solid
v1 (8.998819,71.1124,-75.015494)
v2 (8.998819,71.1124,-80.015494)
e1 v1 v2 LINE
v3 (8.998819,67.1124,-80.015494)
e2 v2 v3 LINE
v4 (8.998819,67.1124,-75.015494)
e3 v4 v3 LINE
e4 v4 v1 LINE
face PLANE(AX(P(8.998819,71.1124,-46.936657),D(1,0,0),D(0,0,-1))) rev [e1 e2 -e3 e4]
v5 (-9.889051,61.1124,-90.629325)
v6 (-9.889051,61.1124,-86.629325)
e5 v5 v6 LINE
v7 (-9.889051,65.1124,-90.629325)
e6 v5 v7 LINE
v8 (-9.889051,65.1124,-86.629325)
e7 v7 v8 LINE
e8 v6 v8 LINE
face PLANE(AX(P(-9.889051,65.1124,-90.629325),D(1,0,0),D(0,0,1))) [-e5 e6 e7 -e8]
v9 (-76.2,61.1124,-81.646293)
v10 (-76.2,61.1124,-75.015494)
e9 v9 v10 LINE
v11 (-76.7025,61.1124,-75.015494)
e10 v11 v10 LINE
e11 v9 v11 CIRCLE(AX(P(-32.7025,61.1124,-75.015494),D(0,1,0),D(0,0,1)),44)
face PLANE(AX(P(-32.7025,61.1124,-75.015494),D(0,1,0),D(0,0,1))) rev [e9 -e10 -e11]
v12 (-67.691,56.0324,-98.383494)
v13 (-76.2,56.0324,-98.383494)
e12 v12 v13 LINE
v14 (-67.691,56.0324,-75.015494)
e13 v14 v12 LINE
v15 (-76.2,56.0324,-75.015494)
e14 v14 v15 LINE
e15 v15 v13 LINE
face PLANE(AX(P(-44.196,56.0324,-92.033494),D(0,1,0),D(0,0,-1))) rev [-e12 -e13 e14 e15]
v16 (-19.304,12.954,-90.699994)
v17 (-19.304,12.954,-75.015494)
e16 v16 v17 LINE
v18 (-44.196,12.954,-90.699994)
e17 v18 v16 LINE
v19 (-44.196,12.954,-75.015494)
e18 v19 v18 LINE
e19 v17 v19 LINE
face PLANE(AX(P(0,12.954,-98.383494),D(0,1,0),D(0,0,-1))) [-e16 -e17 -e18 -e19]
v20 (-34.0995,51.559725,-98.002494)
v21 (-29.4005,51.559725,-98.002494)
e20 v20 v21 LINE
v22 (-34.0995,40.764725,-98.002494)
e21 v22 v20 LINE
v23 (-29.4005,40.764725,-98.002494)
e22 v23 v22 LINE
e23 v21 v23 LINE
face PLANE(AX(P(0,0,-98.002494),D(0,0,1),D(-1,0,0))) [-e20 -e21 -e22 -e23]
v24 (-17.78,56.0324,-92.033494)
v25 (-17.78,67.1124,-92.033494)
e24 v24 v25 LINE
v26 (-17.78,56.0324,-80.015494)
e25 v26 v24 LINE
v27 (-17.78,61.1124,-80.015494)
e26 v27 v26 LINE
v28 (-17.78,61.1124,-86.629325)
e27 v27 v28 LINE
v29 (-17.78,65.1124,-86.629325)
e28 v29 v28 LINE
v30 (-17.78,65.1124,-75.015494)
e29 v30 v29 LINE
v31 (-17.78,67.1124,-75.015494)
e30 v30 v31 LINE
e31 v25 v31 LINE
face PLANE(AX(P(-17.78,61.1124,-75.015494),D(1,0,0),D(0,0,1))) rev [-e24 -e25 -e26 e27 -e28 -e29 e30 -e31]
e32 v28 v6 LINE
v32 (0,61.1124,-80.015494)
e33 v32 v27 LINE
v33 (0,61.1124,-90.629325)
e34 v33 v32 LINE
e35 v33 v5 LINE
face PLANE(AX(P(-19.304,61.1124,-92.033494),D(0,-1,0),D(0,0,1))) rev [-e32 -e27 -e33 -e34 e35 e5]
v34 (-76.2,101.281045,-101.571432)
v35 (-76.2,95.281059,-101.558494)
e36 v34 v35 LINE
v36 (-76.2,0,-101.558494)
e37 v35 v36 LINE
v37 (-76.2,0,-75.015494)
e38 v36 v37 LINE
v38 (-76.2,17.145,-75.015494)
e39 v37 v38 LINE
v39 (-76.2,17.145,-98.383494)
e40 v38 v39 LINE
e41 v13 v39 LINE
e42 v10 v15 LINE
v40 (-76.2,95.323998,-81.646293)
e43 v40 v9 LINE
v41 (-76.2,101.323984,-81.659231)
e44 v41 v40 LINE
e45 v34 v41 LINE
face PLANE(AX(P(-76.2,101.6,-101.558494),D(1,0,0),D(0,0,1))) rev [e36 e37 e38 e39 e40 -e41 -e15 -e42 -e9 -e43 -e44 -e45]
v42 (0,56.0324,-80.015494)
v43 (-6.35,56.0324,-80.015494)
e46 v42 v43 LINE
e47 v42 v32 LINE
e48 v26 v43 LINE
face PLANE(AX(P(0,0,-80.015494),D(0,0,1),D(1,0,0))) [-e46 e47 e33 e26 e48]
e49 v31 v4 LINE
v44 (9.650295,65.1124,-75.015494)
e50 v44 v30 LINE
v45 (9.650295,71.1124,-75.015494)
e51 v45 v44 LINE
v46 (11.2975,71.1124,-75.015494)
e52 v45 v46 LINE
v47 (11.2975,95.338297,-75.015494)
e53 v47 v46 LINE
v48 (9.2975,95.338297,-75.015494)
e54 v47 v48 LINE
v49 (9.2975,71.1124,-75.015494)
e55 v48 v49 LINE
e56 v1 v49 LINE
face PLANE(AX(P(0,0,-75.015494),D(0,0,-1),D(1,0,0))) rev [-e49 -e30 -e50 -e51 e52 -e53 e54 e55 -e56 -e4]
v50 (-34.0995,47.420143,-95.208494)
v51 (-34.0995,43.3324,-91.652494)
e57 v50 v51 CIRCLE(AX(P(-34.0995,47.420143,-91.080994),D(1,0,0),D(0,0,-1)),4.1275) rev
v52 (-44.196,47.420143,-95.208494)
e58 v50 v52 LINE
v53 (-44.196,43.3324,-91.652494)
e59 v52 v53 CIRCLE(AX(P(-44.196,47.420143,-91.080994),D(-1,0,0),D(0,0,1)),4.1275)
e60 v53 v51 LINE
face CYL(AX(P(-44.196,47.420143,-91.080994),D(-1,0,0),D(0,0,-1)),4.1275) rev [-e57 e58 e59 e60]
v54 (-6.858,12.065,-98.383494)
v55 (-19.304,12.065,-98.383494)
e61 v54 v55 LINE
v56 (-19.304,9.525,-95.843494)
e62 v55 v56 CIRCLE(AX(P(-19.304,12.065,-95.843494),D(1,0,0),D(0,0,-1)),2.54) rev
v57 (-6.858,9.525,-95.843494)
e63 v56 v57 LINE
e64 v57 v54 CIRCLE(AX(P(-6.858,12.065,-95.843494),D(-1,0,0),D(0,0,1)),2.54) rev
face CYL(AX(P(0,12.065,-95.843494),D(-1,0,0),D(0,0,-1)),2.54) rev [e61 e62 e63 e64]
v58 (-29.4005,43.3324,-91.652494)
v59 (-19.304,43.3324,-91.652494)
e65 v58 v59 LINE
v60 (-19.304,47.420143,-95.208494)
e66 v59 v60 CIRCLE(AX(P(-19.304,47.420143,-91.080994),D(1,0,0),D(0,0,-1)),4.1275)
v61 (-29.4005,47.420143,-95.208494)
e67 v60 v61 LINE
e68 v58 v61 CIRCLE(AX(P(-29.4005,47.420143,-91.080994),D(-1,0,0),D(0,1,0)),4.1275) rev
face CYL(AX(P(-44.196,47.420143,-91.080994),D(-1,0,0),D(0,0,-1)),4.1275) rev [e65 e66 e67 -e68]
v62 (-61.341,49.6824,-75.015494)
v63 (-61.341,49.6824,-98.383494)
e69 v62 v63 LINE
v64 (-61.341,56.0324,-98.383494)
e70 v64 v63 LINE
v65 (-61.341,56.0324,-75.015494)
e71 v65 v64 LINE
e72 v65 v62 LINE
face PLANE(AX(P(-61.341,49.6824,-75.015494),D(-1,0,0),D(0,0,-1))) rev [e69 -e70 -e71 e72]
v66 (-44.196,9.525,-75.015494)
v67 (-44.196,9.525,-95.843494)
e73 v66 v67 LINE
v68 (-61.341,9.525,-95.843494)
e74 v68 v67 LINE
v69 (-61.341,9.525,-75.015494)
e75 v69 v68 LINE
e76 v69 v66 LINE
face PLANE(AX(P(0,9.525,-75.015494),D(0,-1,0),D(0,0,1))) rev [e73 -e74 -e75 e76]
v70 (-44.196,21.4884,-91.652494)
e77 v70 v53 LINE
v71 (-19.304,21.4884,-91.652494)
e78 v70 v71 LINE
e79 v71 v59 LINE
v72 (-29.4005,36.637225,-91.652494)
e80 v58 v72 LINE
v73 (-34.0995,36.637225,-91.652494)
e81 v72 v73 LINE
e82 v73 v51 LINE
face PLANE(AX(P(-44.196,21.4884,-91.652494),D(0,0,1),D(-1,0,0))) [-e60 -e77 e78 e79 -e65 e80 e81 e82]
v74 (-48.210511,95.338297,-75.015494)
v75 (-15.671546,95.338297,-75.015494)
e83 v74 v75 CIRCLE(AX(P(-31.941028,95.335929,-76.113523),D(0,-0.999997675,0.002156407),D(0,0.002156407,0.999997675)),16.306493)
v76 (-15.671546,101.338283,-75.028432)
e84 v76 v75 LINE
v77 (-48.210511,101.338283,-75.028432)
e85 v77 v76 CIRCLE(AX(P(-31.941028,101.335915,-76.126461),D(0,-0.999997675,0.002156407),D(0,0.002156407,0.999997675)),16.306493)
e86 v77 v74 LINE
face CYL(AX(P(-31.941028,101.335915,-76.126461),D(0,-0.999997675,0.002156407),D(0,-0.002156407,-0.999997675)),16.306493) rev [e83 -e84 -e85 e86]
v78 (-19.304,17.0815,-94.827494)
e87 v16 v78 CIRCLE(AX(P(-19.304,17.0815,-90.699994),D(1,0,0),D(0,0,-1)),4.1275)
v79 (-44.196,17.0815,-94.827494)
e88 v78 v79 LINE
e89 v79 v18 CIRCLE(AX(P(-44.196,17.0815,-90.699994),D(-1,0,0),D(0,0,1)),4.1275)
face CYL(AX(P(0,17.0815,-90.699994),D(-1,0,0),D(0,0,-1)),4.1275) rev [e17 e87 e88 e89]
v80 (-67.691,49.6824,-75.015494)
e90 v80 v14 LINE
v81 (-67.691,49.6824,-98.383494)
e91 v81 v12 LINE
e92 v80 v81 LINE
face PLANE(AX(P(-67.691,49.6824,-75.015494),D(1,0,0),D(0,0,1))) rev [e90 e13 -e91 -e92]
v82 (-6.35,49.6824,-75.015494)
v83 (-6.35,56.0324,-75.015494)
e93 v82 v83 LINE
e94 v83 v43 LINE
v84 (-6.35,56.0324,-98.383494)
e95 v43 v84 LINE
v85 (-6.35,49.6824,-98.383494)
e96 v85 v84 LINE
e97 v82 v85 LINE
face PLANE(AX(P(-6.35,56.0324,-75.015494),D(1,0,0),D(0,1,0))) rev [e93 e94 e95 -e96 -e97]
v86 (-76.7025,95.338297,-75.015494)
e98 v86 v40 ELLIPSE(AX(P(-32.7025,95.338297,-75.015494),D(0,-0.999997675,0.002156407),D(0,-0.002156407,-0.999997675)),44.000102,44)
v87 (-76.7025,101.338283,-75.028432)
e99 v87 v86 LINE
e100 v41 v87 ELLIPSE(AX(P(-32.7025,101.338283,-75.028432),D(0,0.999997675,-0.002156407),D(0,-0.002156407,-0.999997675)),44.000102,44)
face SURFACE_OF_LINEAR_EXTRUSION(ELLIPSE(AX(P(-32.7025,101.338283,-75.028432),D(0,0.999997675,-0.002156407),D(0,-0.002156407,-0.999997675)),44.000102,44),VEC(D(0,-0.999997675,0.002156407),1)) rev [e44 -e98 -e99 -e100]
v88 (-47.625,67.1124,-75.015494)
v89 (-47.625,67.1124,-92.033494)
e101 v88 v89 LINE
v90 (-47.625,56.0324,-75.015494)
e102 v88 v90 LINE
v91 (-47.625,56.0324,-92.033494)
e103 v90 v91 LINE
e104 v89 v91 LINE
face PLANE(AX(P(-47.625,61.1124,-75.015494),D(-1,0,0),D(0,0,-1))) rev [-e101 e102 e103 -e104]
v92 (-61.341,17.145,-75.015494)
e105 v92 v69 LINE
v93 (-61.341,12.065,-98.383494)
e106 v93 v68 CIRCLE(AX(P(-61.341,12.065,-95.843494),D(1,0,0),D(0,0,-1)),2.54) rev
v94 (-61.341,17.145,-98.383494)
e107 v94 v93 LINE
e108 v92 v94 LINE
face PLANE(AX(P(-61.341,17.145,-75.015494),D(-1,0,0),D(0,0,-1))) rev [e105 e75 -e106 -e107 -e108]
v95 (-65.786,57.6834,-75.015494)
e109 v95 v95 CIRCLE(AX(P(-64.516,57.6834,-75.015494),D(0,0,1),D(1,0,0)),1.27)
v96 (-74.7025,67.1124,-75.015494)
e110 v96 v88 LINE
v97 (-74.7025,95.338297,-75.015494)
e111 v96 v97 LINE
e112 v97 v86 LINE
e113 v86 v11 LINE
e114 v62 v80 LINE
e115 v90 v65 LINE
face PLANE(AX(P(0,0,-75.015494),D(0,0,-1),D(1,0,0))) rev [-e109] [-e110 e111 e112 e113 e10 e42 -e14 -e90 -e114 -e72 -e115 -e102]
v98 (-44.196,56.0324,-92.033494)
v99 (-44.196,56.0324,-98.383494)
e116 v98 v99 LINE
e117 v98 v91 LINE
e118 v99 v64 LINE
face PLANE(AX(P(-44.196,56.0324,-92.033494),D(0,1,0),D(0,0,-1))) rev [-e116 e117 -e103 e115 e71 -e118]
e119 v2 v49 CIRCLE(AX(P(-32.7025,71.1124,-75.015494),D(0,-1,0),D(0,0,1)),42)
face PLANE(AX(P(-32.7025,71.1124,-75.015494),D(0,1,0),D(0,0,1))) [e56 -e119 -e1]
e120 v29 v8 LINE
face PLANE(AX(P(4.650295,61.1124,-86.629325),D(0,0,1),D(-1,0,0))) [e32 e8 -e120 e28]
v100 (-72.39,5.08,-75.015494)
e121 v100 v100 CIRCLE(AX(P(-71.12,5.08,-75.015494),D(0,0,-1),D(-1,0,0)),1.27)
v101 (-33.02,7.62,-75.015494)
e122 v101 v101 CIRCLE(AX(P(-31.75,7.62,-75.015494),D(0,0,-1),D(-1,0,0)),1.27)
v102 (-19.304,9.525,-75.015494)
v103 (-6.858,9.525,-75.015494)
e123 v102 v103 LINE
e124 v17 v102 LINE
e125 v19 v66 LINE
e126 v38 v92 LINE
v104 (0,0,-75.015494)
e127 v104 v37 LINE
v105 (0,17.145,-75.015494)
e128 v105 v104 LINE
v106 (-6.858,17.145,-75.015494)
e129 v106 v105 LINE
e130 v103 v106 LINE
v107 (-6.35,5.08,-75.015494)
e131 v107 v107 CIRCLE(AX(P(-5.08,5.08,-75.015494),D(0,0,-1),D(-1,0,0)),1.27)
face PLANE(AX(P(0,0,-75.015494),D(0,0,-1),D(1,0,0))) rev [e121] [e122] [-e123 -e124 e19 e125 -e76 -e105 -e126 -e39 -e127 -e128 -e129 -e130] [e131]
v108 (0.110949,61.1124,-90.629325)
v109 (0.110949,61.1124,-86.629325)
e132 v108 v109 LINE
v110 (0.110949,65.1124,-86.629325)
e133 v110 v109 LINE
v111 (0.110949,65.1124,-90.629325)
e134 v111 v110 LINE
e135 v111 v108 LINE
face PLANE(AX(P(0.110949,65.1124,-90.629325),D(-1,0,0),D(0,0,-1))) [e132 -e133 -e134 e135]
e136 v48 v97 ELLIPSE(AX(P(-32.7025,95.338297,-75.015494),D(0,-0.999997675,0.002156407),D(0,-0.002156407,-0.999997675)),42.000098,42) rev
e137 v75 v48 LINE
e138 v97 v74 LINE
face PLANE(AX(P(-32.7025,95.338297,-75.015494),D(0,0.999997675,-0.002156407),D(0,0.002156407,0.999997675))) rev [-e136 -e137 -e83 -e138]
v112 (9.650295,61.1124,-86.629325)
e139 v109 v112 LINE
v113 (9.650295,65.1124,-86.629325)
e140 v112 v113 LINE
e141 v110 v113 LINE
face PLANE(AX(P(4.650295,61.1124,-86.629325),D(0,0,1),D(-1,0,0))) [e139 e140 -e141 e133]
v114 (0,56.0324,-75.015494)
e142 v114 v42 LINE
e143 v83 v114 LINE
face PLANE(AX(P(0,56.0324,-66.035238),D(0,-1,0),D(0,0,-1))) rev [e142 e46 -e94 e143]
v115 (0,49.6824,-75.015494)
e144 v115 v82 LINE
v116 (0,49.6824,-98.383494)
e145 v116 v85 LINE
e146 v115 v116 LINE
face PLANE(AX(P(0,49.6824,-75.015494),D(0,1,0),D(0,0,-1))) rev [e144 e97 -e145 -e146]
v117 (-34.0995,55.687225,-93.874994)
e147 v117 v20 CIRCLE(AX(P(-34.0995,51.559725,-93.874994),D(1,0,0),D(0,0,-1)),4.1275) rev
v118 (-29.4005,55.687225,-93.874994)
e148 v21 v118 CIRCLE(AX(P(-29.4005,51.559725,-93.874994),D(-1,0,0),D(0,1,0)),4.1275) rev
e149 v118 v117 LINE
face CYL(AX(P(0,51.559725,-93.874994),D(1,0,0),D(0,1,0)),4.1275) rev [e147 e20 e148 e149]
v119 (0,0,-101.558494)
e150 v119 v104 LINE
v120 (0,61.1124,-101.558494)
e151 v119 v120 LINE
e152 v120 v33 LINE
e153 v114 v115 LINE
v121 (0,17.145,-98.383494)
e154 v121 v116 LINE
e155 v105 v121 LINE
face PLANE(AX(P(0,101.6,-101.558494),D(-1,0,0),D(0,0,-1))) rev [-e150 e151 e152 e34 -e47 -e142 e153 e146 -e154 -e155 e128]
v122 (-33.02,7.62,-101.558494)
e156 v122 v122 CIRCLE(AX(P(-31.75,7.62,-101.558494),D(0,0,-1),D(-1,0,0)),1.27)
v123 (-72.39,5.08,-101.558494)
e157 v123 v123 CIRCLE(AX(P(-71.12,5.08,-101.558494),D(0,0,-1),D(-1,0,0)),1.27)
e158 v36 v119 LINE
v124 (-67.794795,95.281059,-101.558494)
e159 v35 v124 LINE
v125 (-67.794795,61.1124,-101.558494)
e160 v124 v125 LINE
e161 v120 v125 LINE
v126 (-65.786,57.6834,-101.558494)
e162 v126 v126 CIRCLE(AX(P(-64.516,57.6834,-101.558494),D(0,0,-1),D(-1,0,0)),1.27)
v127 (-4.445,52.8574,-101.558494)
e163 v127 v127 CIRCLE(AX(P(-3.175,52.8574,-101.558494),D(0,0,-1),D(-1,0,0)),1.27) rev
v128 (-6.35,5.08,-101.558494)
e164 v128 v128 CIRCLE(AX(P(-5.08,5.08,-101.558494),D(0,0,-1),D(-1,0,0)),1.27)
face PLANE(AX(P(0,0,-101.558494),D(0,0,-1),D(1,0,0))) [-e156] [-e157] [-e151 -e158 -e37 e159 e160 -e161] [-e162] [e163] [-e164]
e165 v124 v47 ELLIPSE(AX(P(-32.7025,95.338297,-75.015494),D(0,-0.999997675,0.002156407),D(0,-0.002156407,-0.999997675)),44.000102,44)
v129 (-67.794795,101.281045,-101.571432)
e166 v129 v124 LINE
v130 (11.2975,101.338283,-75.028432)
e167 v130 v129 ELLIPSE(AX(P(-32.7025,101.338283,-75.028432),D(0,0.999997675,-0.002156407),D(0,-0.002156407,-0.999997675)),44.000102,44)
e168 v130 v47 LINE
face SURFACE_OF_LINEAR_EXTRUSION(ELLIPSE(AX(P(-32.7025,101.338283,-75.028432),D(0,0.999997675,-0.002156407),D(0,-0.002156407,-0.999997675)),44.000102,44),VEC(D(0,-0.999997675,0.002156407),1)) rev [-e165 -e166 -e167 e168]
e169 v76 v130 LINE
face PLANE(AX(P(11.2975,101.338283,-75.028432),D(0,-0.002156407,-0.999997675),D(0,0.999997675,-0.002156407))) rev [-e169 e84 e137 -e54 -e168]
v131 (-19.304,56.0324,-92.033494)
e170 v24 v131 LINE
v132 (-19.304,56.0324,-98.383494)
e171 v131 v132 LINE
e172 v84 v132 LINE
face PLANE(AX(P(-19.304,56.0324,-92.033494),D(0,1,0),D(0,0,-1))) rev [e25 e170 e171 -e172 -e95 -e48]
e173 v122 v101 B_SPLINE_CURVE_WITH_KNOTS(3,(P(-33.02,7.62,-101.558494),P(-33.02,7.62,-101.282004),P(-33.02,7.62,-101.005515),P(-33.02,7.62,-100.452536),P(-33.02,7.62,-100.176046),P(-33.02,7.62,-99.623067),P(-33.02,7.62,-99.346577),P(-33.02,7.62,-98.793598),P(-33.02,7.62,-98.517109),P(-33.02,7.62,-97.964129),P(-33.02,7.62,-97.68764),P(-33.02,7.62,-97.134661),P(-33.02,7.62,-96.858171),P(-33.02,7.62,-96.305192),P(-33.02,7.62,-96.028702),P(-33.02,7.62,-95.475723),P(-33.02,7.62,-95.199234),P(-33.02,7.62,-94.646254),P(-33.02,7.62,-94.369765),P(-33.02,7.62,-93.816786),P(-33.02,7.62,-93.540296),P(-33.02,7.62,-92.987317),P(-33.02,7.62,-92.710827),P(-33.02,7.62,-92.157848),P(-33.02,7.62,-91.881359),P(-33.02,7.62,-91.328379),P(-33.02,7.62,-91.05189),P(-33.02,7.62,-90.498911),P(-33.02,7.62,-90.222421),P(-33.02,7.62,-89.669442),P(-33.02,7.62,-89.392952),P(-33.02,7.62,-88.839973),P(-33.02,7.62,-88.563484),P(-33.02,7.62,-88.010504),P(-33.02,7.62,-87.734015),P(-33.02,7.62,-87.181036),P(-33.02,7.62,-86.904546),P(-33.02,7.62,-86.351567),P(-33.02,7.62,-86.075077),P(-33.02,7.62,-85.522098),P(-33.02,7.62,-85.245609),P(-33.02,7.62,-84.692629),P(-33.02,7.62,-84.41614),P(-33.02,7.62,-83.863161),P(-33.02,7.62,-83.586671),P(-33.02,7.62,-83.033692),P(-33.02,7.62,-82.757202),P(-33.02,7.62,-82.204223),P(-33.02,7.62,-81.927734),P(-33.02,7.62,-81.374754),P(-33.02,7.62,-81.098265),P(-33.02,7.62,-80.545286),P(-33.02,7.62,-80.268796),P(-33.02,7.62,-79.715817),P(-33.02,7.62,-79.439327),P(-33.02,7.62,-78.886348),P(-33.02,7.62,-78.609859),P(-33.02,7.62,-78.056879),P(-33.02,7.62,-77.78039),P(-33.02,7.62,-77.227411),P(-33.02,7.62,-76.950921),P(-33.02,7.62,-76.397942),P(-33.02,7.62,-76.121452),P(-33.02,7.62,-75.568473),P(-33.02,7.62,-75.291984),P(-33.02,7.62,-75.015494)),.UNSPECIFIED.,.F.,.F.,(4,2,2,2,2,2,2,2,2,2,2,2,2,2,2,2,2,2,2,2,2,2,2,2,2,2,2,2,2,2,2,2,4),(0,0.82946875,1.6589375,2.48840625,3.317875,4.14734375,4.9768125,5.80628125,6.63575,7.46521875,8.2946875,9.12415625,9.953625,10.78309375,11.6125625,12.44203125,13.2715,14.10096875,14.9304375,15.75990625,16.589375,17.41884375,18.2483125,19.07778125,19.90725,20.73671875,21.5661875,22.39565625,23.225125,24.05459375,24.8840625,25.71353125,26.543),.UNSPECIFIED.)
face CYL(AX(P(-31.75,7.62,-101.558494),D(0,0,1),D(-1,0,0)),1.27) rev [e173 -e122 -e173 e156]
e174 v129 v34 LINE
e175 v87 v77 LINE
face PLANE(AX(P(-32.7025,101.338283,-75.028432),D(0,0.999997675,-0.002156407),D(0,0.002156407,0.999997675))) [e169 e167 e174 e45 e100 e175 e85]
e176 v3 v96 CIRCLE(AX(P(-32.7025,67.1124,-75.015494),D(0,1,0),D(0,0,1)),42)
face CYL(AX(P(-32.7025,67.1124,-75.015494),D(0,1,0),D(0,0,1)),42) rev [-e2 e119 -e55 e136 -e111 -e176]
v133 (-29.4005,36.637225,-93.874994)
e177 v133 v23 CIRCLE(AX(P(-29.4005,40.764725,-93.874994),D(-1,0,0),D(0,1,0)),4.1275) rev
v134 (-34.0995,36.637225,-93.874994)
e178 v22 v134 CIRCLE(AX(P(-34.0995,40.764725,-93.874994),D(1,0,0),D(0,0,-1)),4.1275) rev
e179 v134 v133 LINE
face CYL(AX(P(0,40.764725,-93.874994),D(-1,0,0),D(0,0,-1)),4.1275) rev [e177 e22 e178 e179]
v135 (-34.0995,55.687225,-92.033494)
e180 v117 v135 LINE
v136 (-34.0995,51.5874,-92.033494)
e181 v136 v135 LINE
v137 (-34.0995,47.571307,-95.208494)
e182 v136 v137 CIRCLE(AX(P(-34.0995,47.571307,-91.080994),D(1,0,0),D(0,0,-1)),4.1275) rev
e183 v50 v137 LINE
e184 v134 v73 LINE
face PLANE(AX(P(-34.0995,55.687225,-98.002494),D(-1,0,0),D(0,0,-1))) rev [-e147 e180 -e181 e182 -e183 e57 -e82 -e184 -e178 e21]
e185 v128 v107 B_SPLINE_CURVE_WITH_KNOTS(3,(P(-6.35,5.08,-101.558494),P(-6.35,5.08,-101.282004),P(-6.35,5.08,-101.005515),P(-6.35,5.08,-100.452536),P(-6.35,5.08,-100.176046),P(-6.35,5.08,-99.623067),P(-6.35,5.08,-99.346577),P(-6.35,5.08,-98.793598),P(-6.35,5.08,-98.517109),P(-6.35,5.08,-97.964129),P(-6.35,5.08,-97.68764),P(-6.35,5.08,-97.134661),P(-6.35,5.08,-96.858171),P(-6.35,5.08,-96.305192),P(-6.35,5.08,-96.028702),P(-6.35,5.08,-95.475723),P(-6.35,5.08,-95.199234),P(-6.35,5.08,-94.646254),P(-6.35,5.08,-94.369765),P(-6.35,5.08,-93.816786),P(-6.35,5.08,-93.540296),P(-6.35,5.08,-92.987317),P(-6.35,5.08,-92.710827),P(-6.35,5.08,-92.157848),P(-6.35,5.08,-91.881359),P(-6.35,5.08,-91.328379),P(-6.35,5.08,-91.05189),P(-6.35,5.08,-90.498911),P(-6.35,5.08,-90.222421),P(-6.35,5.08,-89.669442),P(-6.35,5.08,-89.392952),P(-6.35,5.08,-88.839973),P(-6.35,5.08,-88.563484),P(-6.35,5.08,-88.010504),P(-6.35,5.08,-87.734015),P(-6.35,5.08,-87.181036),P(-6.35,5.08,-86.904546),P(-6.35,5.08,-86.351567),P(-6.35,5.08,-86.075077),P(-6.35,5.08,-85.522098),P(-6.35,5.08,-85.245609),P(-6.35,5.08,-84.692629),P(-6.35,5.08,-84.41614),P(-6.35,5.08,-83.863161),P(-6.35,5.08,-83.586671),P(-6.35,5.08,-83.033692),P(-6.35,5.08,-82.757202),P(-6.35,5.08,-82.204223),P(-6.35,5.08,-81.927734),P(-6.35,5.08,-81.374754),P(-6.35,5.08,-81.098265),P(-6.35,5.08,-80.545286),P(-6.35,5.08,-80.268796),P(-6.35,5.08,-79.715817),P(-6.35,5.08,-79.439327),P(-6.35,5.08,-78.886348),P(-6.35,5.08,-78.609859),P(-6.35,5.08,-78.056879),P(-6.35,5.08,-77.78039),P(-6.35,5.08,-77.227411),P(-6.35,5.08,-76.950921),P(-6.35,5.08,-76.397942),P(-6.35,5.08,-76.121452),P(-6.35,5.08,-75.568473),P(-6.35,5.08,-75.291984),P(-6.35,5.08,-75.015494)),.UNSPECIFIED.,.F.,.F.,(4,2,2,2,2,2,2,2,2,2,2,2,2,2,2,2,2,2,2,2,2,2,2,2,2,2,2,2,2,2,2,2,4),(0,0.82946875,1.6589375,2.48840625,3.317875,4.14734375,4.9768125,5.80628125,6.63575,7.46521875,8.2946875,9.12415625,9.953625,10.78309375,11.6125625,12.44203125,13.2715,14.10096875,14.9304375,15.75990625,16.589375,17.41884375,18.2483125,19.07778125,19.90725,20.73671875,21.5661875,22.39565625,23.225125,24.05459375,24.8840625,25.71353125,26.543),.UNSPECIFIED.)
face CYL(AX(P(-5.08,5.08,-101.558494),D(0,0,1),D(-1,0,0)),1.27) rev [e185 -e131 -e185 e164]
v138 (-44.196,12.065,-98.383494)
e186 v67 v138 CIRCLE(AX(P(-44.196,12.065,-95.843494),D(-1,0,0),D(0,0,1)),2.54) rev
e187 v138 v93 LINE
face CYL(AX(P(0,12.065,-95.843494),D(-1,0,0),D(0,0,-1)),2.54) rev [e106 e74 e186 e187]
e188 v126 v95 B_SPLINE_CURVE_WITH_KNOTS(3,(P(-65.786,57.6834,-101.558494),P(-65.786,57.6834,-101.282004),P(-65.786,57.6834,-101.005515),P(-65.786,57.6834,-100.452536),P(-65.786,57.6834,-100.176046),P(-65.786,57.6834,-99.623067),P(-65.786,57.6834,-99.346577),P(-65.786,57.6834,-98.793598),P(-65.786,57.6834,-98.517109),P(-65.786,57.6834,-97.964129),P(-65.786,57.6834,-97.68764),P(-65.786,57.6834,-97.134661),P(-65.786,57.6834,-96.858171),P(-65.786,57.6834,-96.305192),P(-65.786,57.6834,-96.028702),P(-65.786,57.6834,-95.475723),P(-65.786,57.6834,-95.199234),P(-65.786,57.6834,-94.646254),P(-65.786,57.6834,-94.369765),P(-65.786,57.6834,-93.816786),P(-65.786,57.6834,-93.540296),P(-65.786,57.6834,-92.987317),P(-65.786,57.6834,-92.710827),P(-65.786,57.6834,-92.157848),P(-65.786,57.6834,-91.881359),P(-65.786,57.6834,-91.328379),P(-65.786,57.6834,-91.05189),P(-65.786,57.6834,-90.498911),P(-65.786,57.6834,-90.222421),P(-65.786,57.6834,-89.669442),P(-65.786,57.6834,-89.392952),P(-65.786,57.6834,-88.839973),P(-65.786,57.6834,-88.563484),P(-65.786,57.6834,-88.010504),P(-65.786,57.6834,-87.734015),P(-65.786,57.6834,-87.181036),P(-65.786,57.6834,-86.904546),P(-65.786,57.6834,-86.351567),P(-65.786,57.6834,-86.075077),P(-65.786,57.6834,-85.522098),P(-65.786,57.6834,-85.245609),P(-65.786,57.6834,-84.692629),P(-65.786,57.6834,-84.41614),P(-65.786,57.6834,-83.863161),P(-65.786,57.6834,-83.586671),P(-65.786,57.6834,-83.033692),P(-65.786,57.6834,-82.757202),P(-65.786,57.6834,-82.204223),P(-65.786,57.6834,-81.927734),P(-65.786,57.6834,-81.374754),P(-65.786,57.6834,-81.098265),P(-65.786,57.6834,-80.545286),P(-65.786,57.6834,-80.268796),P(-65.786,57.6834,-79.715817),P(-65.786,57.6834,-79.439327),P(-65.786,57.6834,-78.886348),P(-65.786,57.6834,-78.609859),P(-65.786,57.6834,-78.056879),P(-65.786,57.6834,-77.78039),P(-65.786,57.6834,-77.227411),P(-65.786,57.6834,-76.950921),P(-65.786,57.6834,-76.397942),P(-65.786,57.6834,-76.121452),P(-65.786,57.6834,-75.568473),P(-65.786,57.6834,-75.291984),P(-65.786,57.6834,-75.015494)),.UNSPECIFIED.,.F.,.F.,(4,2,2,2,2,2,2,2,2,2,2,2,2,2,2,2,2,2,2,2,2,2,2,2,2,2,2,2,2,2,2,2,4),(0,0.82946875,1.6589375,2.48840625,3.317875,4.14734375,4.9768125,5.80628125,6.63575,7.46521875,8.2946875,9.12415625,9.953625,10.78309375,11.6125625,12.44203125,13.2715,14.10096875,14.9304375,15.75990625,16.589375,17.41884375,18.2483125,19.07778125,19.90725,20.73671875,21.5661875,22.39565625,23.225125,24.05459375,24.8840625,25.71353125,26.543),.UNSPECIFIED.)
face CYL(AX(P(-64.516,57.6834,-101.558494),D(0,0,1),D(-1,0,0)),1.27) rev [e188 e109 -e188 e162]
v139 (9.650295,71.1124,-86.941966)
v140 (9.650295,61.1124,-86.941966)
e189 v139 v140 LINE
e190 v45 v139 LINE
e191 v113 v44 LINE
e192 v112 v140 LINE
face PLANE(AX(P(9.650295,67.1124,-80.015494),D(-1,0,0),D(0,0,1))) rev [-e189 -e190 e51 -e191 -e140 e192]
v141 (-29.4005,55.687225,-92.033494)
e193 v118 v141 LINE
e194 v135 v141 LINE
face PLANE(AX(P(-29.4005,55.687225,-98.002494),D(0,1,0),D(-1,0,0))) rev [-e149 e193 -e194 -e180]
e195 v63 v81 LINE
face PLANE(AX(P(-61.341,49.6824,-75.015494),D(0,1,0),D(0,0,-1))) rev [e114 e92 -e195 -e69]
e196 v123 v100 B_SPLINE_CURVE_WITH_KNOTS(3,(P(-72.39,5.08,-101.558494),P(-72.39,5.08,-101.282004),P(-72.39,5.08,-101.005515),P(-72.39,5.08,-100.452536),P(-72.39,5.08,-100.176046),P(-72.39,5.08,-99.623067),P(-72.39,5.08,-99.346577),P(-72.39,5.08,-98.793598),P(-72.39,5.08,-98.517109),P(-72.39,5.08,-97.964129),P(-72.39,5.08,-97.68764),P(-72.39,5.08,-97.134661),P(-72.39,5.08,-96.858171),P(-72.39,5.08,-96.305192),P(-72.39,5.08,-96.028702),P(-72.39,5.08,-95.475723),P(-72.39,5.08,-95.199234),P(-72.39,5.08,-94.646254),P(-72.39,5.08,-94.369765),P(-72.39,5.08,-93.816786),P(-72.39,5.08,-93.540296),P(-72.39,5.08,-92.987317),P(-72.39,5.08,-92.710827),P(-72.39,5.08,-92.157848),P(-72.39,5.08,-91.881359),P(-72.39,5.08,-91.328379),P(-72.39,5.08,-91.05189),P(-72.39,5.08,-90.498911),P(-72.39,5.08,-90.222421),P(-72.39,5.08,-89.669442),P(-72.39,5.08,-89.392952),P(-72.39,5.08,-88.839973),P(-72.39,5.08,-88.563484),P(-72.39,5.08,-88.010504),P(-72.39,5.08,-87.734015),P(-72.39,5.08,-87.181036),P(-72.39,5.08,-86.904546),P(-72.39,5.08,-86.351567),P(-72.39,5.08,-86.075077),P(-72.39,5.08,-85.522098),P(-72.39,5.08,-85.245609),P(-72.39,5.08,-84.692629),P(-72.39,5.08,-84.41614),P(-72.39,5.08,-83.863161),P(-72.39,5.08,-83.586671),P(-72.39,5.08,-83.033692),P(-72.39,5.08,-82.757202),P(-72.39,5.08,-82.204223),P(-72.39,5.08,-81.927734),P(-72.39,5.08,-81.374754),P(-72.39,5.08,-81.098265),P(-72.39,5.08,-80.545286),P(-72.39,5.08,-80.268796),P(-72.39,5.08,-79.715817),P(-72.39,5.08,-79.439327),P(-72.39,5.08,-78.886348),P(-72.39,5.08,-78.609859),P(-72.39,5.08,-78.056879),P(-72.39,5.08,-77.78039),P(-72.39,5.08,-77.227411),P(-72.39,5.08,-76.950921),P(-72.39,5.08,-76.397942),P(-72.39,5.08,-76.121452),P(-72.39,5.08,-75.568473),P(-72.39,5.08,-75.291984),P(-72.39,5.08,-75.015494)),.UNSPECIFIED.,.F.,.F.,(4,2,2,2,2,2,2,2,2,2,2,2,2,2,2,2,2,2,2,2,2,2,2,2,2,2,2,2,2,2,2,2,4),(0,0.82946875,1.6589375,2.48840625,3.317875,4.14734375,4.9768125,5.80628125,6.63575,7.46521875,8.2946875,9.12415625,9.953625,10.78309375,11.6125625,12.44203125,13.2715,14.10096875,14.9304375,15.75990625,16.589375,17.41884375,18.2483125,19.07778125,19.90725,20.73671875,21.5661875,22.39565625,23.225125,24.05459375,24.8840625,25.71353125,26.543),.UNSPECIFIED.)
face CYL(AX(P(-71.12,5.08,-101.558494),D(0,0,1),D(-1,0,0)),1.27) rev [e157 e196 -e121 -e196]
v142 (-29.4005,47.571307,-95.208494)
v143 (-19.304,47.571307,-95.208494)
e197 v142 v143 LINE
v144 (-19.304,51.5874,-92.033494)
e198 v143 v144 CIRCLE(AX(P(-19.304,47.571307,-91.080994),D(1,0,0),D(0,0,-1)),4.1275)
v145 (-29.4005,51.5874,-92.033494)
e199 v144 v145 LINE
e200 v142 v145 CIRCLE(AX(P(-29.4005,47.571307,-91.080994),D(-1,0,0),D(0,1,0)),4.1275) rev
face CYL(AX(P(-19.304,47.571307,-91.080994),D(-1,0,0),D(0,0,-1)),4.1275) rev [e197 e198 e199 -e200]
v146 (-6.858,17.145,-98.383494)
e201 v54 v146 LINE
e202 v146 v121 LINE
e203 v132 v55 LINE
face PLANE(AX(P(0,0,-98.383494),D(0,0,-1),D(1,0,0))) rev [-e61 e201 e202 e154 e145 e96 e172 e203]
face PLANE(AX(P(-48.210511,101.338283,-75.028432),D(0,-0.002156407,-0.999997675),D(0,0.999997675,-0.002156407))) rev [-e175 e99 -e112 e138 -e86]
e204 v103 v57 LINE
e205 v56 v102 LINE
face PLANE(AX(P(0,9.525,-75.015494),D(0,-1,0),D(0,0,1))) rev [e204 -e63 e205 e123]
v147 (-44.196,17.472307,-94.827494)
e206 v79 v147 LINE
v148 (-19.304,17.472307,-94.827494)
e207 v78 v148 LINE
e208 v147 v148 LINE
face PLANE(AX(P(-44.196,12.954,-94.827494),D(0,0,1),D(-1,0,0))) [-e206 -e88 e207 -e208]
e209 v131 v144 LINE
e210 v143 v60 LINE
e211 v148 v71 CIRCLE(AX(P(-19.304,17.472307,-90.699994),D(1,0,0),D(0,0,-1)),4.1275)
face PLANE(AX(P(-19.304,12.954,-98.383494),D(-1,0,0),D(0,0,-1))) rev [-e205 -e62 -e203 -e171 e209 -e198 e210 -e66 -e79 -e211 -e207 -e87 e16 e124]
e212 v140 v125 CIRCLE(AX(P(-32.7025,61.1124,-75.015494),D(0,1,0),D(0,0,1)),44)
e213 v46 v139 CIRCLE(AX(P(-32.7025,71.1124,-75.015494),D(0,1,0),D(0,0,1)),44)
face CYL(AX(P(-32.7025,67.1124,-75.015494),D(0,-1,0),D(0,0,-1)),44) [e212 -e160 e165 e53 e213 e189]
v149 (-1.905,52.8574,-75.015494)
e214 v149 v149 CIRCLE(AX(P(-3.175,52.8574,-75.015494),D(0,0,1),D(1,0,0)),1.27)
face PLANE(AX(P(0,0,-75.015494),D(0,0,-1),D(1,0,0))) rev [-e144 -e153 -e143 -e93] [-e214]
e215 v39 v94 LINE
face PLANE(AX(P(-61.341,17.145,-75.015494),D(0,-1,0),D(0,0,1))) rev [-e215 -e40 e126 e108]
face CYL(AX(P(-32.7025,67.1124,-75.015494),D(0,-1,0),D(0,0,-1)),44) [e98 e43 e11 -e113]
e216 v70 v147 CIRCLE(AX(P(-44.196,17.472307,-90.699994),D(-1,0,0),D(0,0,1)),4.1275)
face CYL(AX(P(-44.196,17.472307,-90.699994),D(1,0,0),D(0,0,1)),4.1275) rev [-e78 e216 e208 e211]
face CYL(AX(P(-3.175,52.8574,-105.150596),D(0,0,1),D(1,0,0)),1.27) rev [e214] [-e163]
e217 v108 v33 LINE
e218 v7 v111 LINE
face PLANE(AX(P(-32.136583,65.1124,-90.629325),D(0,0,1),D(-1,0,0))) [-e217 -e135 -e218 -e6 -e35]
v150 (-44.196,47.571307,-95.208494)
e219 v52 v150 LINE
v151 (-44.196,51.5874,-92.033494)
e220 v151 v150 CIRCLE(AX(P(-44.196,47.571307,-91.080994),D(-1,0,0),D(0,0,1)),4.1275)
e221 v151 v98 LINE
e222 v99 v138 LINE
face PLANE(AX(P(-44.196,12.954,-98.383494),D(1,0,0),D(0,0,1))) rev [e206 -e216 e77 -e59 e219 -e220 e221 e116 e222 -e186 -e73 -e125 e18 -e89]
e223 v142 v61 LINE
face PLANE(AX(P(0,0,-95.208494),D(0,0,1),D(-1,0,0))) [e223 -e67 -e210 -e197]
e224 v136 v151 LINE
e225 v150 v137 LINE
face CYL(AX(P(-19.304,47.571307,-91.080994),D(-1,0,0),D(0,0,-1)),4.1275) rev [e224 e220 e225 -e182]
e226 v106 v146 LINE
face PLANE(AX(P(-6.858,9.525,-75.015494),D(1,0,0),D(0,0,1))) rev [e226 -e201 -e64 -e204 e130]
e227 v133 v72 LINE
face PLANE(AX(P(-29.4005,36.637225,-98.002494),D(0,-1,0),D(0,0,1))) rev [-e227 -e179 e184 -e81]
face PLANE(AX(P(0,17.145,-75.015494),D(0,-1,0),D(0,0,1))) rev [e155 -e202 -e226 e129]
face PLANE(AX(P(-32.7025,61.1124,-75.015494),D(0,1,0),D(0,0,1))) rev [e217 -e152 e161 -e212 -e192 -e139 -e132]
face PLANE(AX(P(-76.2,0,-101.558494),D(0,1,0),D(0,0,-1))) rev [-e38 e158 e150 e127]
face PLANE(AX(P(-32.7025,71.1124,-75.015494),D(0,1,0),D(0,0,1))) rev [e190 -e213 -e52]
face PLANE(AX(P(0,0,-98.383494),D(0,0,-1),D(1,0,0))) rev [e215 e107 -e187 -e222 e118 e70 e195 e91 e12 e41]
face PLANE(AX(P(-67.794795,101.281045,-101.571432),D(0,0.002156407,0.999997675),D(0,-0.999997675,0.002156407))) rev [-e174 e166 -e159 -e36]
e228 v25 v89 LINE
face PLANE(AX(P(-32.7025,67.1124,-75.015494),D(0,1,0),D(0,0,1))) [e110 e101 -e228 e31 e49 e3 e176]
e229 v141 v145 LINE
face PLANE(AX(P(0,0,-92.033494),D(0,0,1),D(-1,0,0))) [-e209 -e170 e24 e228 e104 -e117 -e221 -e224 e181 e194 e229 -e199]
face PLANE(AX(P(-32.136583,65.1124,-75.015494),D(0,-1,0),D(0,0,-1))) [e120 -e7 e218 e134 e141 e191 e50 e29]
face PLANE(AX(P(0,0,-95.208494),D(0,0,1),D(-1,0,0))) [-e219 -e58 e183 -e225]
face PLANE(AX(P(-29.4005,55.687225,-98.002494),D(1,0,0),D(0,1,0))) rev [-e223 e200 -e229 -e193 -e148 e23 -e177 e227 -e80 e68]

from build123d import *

# Parameters (mm, degrees)
BOSS_EXTRUDE4_START        = -101.558494002
BOSS_EXTRUDE4_OUTLINE_R    = 1.27
BOSS_EXTRUDE4_DEPTH        = 26.543
BOSS_EXTRUDE4_2_DEPTH      = 3.175
BOSS_EXTRUDE4_START_2      = -98.383494002
BOSS_EXTRUDE4_3_OUTLINE_W  = 4.699
BOSS_EXTRUDE4_3_OUTLINE_H  = 19.05
BOSS_EXTRUDE4_3_DEPTH      = 3.175
BOSS_EXTRUDE4_START_3      = -86.941966379
BOSS_EXTRUDE4_4_OUTLINE_W  = 27.430295146
BOSS_EXTRUDE4_4_OUTLINE_H  = 6
BOSS_EXTRUDE4_4_DEPTH      = 6.926472377
BOSS_EXTRUDE4_START_4      = -95.208494002
BOSS_EXTRUDE4_5_OUTLINE_W  = 29.845
BOSS_EXTRUDE4_5_OUTLINE_H  = 6
BOSS_EXTRUDE4_5_DEPTH      = 3.175
BOSS_EXTRUDE4_6_OUTLINE_W  = 4.699
BOSS_EXTRUDE4_6_OUTLINE_H  = 19.05
BOSS_EXTRUDE4_6_DEPTH      = 0.381
BOSS_EXTRUDE4_START_5      = -44.196
BOSS_EXTRUDE4_7_DEPTH      = 24.892
BOSS_EXTRUDE4_8_DEPTH      = 10.0965
BOSS_EXTRUDE4_START_6      = -29.4005
BOSS_EXTRUDE4_9_DEPTH      = 10.0965
BOSS_EXTRUDE4_START_7      = -62
BOSS_EXTRUDE4_10_OUTLINE_W = 5.08
BOSS_EXTRUDE4_10_OUTLINE_H = 3.175
BOSS_EXTRUDE4_10_DEPTH     = 56
BOSS_EXTRUDE4_START_8      = 61.1124
BOSS_EXTRUDE4_11_DEPTH     = 6
BOSS_EXTRUDE4_START_9      = 56.0324
BOSS_EXTRUDE4_12_OUTLINE_W = 29.845
BOSS_EXTRUDE4_12_OUTLINE_H = 3.175
BOSS_EXTRUDE4_12_DEPTH     = 5.08
BOSS_EXTRUDE4_START_10     = 55.687225257
BOSS_EXTRUDE4_13_OUTLINE_W = 24.892
BOSS_EXTRUDE4_13_OUTLINE_H = 3.175
BOSS_EXTRUDE4_13_DEPTH     = 1.422815543
BOSS_EXTRUDE5_DEPTH        = 4
INDENT2_START              = 61.1124
INDENT2_DEPTH              = 4
CUT_EXTRUDE1_DEPTH         = 5
BOSS_EXTRUDE6_DEPTH        = 21.543
SKETCH18_W                 = 6.35
SKETCH18_H                 = 6.35
BOSS_EXTRUDE7_DEPTH        = 5
SKETCH19_R                 = 1.27
CUT_EXTRUDE2_DEPTH         = 26.543
SKETCH20_R                 = 42
CUT_EXTRUDE3_DEPTH         = 4
BOSS_EXTRUDE9_DEPTH        = 5
BOSS_EXTRUDE10_DEPTH       = 24.225897016
BOSS_EXTRUDE10_START       = 95.499839318
BOSS_EXTRUDE10_2_OUTLINE_W = 91
BOSS_EXTRUDE10_2_OUTLINE_H = 47
BOSS_EXTRUDE10_2_DEPTH     = 1.500160682
BOSS_EXTRUDE11_DEPTH       = 6


with BuildPart() as part:
    # Boss-Extrude4: read off the stored shape, not the designer's step
    # Boss-Extrude4 outline → Boss-Extrude4 (new body)
    # profile 1 of 3: a face of its own
    with BuildSketch(Plane.XY.offset(BOSS_EXTRUDE4_START)):
        Polygon((0, 61.1124), (-17.78, 61.1124), (-17.78, 56.0324), (-6.35, 56.0324), (-6.35, 49.6824), (0, 49.6824), align=None)
        with Locations((-3.81, 58.5724)):
            Circle(BOSS_EXTRUDE4_OUTLINE_R, mode=Mode.SUBTRACT)
    # profile 2 of 3: a face of its own
    with BuildSketch(Plane.XY.offset(BOSS_EXTRUDE4_START)):
        Polygon((-47.625, 56.0324), (-47.625, 61.1124), (-47.625, 67.1124), (-76.2, 67.1124), (-76.2, 56.0324), (-67.691, 56.0324), (-67.691, 49.6824), (-61.341, 49.6824), (-61.341, 56.0324), align=None)
        with Locations((-64.516, 57.6834)):
            Circle(BOSS_EXTRUDE4_OUTLINE_R, mode=Mode.SUBTRACT)
    # profile 3 of 3: a face of its own
    with BuildSketch(Plane.XY.offset(BOSS_EXTRUDE4_START)):
        Polygon((0, 0), (0, 17.145), (-6.858, 17.145), (-6.858, 9.525), (-19.304, 9.525), (-19.304, 12.954), (-44.196, 12.954), (-44.196, 9.525), (-61.341, 9.525), (-61.341, 17.145), (-76.2, 17.145), (-76.2, 0), align=None)
        with Locations((-71.12, 5.08)):
            Circle(BOSS_EXTRUDE4_OUTLINE_R, mode=Mode.SUBTRACT)
        with Locations((-31.75, 7.62)):
            Circle(BOSS_EXTRUDE4_OUTLINE_R, mode=Mode.SUBTRACT)
        with Locations((-5.08, 5.08)):
            Circle(BOSS_EXTRUDE4_OUTLINE_R, mode=Mode.SUBTRACT)
    extrude(amount=BOSS_EXTRUDE4_DEPTH)

    # Boss-Extrude4 2 outline → Boss-Extrude4 2 (add)
    with BuildSketch(Plane.XY.offset(BOSS_EXTRUDE4_START)):
        Polygon((-47.625, 67.1124), (-47.625, 56.0324), (-61.341, 56.0324), (-61.341, 49.6824), (-67.691, 49.6824), (-67.691, 56.0324), (-76.2, 56.0324), (-76.2, 17.145), (-61.341, 17.145), (-61.341, 9.525), (-44.196, 9.525), (-44.196, 12.954), (-19.304, 12.954), (-19.304, 9.525), (-6.858, 9.525), (-6.858, 17.145), (0, 17.145), (0, 49.6824), (-6.35, 49.6824), (-6.35, 56.0324), (-17.78, 56.0324), (-17.78, 67.1124), align=None)
    extrude(amount=BOSS_EXTRUDE4_2_DEPTH)

    # Boss-Extrude4 3 outline → Boss-Extrude4 3 (add)
    with BuildSketch(Plane.XY.offset(BOSS_EXTRUDE4_START_2)):
        Polygon((-47.625, 67.1124), (-47.625, 56.0324), (-44.196, 56.0324), (-44.196, 12.954), (-19.304, 12.954), (-19.304, 56.0324), (-17.78, 56.0324), (-17.78, 67.1124), align=None)
        with Locations((-31.75, 46.162225257)):
            Rectangle(BOSS_EXTRUDE4_3_OUTLINE_W, BOSS_EXTRUDE4_3_OUTLINE_H, mode=Mode.SUBTRACT)
    extrude(amount=BOSS_EXTRUDE4_3_DEPTH)

    # Boss-Extrude4 4 outline → Boss-Extrude4 4 (add)
    with BuildSketch(Plane.XY.offset(BOSS_EXTRUDE4_START_3)):
        with Locations((-4.064852427, 64.1124)):
            Rectangle(BOSS_EXTRUDE4_4_OUTLINE_W, BOSS_EXTRUDE4_4_OUTLINE_H)
    extrude(amount=BOSS_EXTRUDE4_4_DEPTH)

    # Boss-Extrude4 5 outline → Boss-Extrude4 5 (add)
    with BuildSketch(Plane.XY.offset(BOSS_EXTRUDE4_START_4)):
        with Locations((-32.7025, 64.1124)):
            Rectangle(BOSS_EXTRUDE4_5_OUTLINE_W, BOSS_EXTRUDE4_5_OUTLINE_H)
    extrude(amount=BOSS_EXTRUDE4_5_DEPTH)

    # Boss-Extrude4 6 outline → Boss-Extrude4 6 (add)
    with BuildSketch(Plane.XY.offset(BOSS_EXTRUDE4_START_2)):
        with Locations((-31.75, 46.162225257)):
            Rectangle(BOSS_EXTRUDE4_6_OUTLINE_W, BOSS_EXTRUDE4_6_OUTLINE_H)
    extrude(amount=BOSS_EXTRUDE4_6_DEPTH)

    # Boss-Extrude4 7 outline → Boss-Extrude4 7 (add)
    with BuildSketch(Plane.YZ.offset(BOSS_EXTRUDE4_START_5)):
        with BuildLine():
            Line((55.687225257, -92.033494002), (55.687225257, -93.874994002))
            ThreePointArc((55.687225257, -93.874994002), (54.478308496, -96.793577242), (51.559725257, -98.002494002))
            Line((51.559725257, -98.002494002), (55.687225257, -98.002494002))
            Line((55.687225257, -98.002494002), (55.687225257, -95.208494002))
            Line((55.687225257, -95.208494002), (61.1124, -95.208494002))
            Line((61.1124, -95.208494002), (61.1124, -92.033494002))
            Line((61.1124, -92.033494002), (55.687225257, -92.033494002))
        make_face()
        with BuildLine():
            Line((12.954, -95.208494002), (36.637225257, -95.208494002))
            Line((36.637225257, -95.208494002), (36.637225257, -98.002494002))
            Line((36.637225257, -98.002494002), (40.764725257, -98.002494002))
            ThreePointArc((40.764725257, -98.002494002), (37.846142018, -96.793577242), (36.637225257, -93.874994002))
            Line((36.637225257, -93.874994002), (36.637225257, -91.652494002))
            Line((36.637225257, -91.652494002), (21.4884, -91.652494002))
            ThreePointArc((21.4884, -91.652494002), (20.032074207, -93.937871393), (17.472307372, -94.827494002))
            Line((17.472307372, -94.827494002), (17.0815, -94.827494002))
            ThreePointArc((17.0815, -94.827494002), (14.16291676, -93.618577241), (12.954, -90.699994002))
            Line((12.954, -90.699994002), (12.954, -95.208494002))
        make_face()
    extrude(amount=BOSS_EXTRUDE4_7_DEPTH)

    # Boss-Extrude4 8 outline → Boss-Extrude4 8 (add)
    with BuildSketch(Plane.YZ.offset(BOSS_EXTRUDE4_START_5)):
        with BuildLine():
            Line((55.687225257, -92.033494002), (51.5874, -92.033494002))
            ThreePointArc((51.5874, -92.033494002), (50.131074207, -94.318871393), (47.571307372, -95.208494002))
            Line((47.571307372, -95.208494002), (55.465878608, -95.208494002))
            ThreePointArc((55.465878608, -95.208494002), (55.631512592, -94.55086688), (55.687225257, -93.874994002))
            Line((55.687225257, -93.874994002), (55.687225257, -92.033494002))
        make_face()
        with BuildLine():
            Line((36.858571906, -95.208494002), (47.420143143, -95.208494002))
            ThreePointArc((47.420143143, -95.208494002), (44.711140559, -94.19508476), (43.3324, -91.652494002))
            Line((43.3324, -91.652494002), (36.637225257, -91.652494002))
            Line((36.637225257, -91.652494002), (36.637225257, -93.874994002))
            ThreePointArc((36.637225257, -93.874994002), (36.692937922, -94.55086688), (36.858571906, -95.208494002))
        make_face()
    extrude(amount=BOSS_EXTRUDE4_8_DEPTH)

    # Boss-Extrude4 9 outline → Boss-Extrude4 9 (add)
    with BuildSketch(Plane.YZ.offset(BOSS_EXTRUDE4_START_6)):
        with BuildLine():
            Line((55.687225257, -92.033494002), (51.5874, -92.033494002))
            ThreePointArc((51.5874, -92.033494002), (50.131074207, -94.318871393), (47.571307372, -95.208494002))
            Line((47.571307372, -95.208494002), (55.465878608, -95.208494002))
            ThreePointArc((55.465878608, -95.208494002), (55.631512592, -94.55086688), (55.687225257, -93.874994002))
            Line((55.687225257, -93.874994002), (55.687225257, -92.033494002))
        make_face()
        with BuildLine():
            Line((36.858571906, -95.208494002), (47.420143143, -95.208494002))
            ThreePointArc((47.420143143, -95.208494002), (44.711140559, -94.19508476), (43.3324, -91.652494002))
            Line((43.3324, -91.652494002), (36.637225257, -91.652494002))
            Line((36.637225257, -91.652494002), (36.637225257, -93.874994002))
            ThreePointArc((36.637225257, -93.874994002), (36.692937922, -94.55086688), (36.858571906, -95.208494002))
        make_face()
    extrude(amount=BOSS_EXTRUDE4_9_DEPTH)

    # Boss-Extrude4 10 outline → Boss-Extrude4 10 (add)
    with BuildSketch(Plane.YZ.offset(BOSS_EXTRUDE4_START_7)):
        with Locations((58.5724, -93.620994002)):
            Rectangle(BOSS_EXTRUDE4_10_OUTLINE_W, BOSS_EXTRUDE4_10_OUTLINE_H)
        with BuildLine():
            Line((9.525, -98.383494002), (12.065, -98.383494002))
            ThreePointArc((12.065, -98.383494002), (10.268948776, -97.639545226), (9.525, -95.843494002))
            Line((9.525, -95.843494002), (9.525, -98.383494002))
        make_face()
    extrude(amount=BOSS_EXTRUDE4_10_DEPTH)

    # Boss-Extrude4 11 outline → Boss-Extrude4 11 (add)
    with BuildSketch(Plane(origin=(0, 0, 0), x_dir=(1, 0, 0), z_dir=(0, 1, 0)).offset(BOSS_EXTRUDE4_START_8)):
        with BuildLine():
            ThreePointArc((-76.2, 81.646292879), (-76.576695149, 78.340400016), (-76.7025, 75.015494002))
            Line((-76.7025, 75.015494002), (-76.2, 75.015494002))
            Line((-76.2, 75.015494002), (-76.2, 81.646292879))
        make_face()
        with BuildLine():
            ThreePointArc((9.650295146, 86.941966379), (-24.542264928, 118.252174767), (-67.794794753, 101.558494002))
            Line((-67.794794753, 101.558494002), (-17.78, 101.558494002))
            Line((-17.78, 101.558494002), (-17.78, 86.941966379))
            Line((-17.78, 86.941966379), (9.650295146, 86.941966379))
        make_face()
    extrude(amount=BOSS_EXTRUDE4_11_DEPTH)

    # Boss-Extrude4 12 outline → Boss-Extrude4 12 (add)
    with BuildSketch(Plane(origin=(0, 0, 0), x_dir=(1, 0, 0), z_dir=(0, 1, 0)).offset(BOSS_EXTRUDE4_START_9)):
        with Locations((-32.7025, 93.620994002)):
            Rectangle(BOSS_EXTRUDE4_12_OUTLINE_W, BOSS_EXTRUDE4_12_OUTLINE_H)
    extrude(amount=BOSS_EXTRUDE4_12_DEPTH)

    # Boss-Extrude4 13 outline → Boss-Extrude4 13 (add)
    with BuildSketch(Plane(origin=(0, 0, 0), x_dir=(1, 0, 0), z_dir=(0, 1, 0)).offset(BOSS_EXTRUDE4_START_10)):
        with Locations((-31.75, 93.620994002)):
            Rectangle(BOSS_EXTRUDE4_13_OUTLINE_W, BOSS_EXTRUDE4_13_OUTLINE_H)
    extrude(amount=BOSS_EXTRUDE4_13_DEPTH)

    # Sketch11 → Boss-Extrude5 (add)
    with BuildSketch(Plane(origin=(0, 67.1124, 0), x_dir=(1, 0, 0), z_dir=(0, 1, 0))):
        with BuildLine():
            Line((-17.78, 80.015494002), (9.650295146, 80.015494002))
            Line((9.650295146, 80.015494002), (9.650295146, 86.941966379))
            ThreePointArc((9.650295146, 86.941966379), (-24.542264928, 118.252174767), (-67.794794753, 101.558494002))
            Line((-67.794794753, 101.558494002), (-76.2, 101.558494002))
            Line((-76.2, 101.558494002), (-76.2, 81.646292879))
            ThreePointArc((-76.2, 81.646292879), (-76.576695149, 78.340400016), (-76.7025, 75.015494002))
            Line((-76.7025, 75.015494002), (-47.625, 75.015494002))
            Line((-47.625, 75.015494002), (-47.625, 92.033494002))
            Line((-47.625, 92.033494002), (-17.78, 92.033494002))
            Line((-17.78, 92.033494002), (-17.78, 80.015494002))
        make_face()
    extrude(amount=BOSS_EXTRUDE5_DEPTH)

    # Indent2: read off the stored shape, not the designer's step
    # Indent2 outline → Indent2 (cut)
    with BuildSketch(Plane(origin=(0, 0, 0), x_dir=(1, 0, 0), z_dir=(0, 1, 0)).offset(INDENT2_START)):
        Polygon((-9.889050862, 86.629325085), (-17.78, 86.629325085), (-17.78, 80.015494002), (9.650295146, 80.015494002), (9.650295146, 86.629325085), (0.110949138, 86.629325085), (0.110949138, 90.629325085), (-9.889050862, 90.629325085), align=None)
    extrude(amount=INDENT2_DEPTH, mode=Mode.SUBTRACT)

    # Sketch16 → Cut-Extrude1 (cut)
    with BuildSketch(Plane.XY.offset(-75.015494002)):
        Polygon((0, 61.1124), (-17.78, 61.1124), (-17.78, 56.0324), (-6.35, 56.0324), (-6.35, 49.6824), (0, 49.6824), align=None)
    extrude(amount=-CUT_EXTRUDE1_DEPTH, mode=Mode.SUBTRACT)

    # Sketch17 → Boss-Extrude6 (add)
    with BuildSketch(Plane.XY.offset(-80.015494002)):
        Polygon((0, 49.6824), (0, 61.1124), (-17.78, 61.1124), (-17.78, 56.0324), (-6.35, 56.0324), (-6.35, 49.6824), align=None)
    extrude(amount=-BOSS_EXTRUDE6_DEPTH)

    # Sketch18 → Boss-Extrude7 (add)
    with BuildSketch(Plane.XY.offset(-80.015494002)):
        with Locations((-3.175, 52.8574)):
            Rectangle(SKETCH18_W, SKETCH18_H)
    extrude(amount=BOSS_EXTRUDE7_DEPTH)

    # Sketch19 → Cut-Extrude2 (cut)
    with BuildSketch(Plane.XY.offset(-75.015494002)):
        with Locations((-3.175, 52.8574)):
            Circle(SKETCH19_R)
    extrude(amount=-CUT_EXTRUDE2_DEPTH, mode=Mode.SUBTRACT)

    # Sketch20 → Cut-Extrude3 (cut)
    with BuildSketch(Plane(origin=(0, 71.1124, 0), x_dir=(1, 0, 0), z_dir=(0, 1, 0))):
        with Locations((-32.7025, 75.015494002)):
            Circle(SKETCH20_R)
    extrude(amount=-CUT_EXTRUDE3_DEPTH, mode=Mode.SUBTRACT)

    # Sketch23 → Boss-Extrude9 (add)
    with BuildSketch(Plane.XY.offset(-80.015494002)):
        Polygon((9.650295146, 71.1124), (8.998818924, 71.1124), (8.998818924, 67.1124), (-17.78, 67.1124), (-17.78, 65.1124), (9.650295146, 65.1124), align=None)
    extrude(amount=BOSS_EXTRUDE9_DEPTH)

    # Boss-Extrude10: read off the stored shape, not the designer's step
    # Boss-Extrude10 outline → Boss-Extrude10 (add)
    with BuildSketch(Plane(origin=(0, 71.1124, 0), x_dir=(1, 0, 0), z_dir=(0, 1, 0))):
        with BuildLine():
            ThreePointArc((-74.7025, 75.015494002), (-46.790110082, 114.582389788), (-0.153012277, 101.558494002))
            ThreePointArc((-0.153012277, 101.558494002), (6.864395786, 89.103104084), (9.2975, 75.015494002))
            Line((9.2975, 75.015494002), (11.2975, 75.015494002))
            ThreePointArc((11.2975, 75.015494002), (-18.703588777, 116.729166635), (-67.794794753, 101.558494002))
            Line((-67.794794753, 101.558494002), (-76.2, 101.558494002))
            Line((-76.2, 101.558494002), (-76.2, 81.646292879))
            ThreePointArc((-76.2, 81.646292879), (-76.576695149, 78.340400016), (-76.7025, 75.015494002))
            Line((-76.7025, 75.015494002), (-74.7025, 75.015494002))
        make_face()
    extrude(amount=BOSS_EXTRUDE10_DEPTH)

    # Boss-Extrude10 2 outline → Boss-Extrude10 2 (cut)
    with BuildSketch(Plane(origin=(0, 0, 0), x_dir=(1, 0, 0), z_dir=(0, 0.9999976749508124, -0.0021564074219559007)).offset(BOSS_EXTRUDE10_START)):
        with Locations((-32.5, 96.5)):
            Rectangle(BOSS_EXTRUDE10_2_OUTLINE_W, BOSS_EXTRUDE10_2_OUTLINE_H)
    extrude(amount=BOSS_EXTRUDE10_2_DEPTH, mode=Mode.SUBTRACT)

    # Sketch26 → Boss-Extrude11 (add)
    with BuildSketch(Plane(origin=(0, 95.499617276, -0.205936562), x_dir=(1, 0, 0), z_dir=(0, 0.9999976749508124, -0.002156407421956261))):
        with BuildLine():
            Line((11.2975, 74.809731376), (-15.671546302, 74.809731376))
            ThreePointArc((-15.671546302, 74.809731376), (-31.94102841, 92.21425616), (-48.210510518, 74.809731376))
            Line((-48.210510518, 74.809731376), (-76.7025, 74.809731376))
            add(Edge.make_bspline(
                [(-76.2, 81.44054567), (-76.7025, 78.144178977), (-76.7025, 74.809731376)],
                knots=[1.419520031, 1.419520031, 1.419520031, 1.570796327, 1.570796327, 1.570796327], degree=2, weights=[1, 0.997140799, 1]))
            Line((-76.2, 81.44054567), (-76.2, 101.35279309))
            Line((-76.2, 101.35279309), (-67.794794753, 101.35279309))
            add(Edge.make_bspline(
                [(11.2975, 74.809731376), (11.2975, 205.920346621), (-67.794794753, 101.35279309)],
                knots=[4.71238898, 4.71238898, 4.71238898, 7.206411806, 7.206411806, 7.206411806], degree=2, weights=[1, 0.318157073, 1]))
        make_face()
    extrude(amount=BOSS_EXTRUDE11_DEPTH)


solid = part.part
